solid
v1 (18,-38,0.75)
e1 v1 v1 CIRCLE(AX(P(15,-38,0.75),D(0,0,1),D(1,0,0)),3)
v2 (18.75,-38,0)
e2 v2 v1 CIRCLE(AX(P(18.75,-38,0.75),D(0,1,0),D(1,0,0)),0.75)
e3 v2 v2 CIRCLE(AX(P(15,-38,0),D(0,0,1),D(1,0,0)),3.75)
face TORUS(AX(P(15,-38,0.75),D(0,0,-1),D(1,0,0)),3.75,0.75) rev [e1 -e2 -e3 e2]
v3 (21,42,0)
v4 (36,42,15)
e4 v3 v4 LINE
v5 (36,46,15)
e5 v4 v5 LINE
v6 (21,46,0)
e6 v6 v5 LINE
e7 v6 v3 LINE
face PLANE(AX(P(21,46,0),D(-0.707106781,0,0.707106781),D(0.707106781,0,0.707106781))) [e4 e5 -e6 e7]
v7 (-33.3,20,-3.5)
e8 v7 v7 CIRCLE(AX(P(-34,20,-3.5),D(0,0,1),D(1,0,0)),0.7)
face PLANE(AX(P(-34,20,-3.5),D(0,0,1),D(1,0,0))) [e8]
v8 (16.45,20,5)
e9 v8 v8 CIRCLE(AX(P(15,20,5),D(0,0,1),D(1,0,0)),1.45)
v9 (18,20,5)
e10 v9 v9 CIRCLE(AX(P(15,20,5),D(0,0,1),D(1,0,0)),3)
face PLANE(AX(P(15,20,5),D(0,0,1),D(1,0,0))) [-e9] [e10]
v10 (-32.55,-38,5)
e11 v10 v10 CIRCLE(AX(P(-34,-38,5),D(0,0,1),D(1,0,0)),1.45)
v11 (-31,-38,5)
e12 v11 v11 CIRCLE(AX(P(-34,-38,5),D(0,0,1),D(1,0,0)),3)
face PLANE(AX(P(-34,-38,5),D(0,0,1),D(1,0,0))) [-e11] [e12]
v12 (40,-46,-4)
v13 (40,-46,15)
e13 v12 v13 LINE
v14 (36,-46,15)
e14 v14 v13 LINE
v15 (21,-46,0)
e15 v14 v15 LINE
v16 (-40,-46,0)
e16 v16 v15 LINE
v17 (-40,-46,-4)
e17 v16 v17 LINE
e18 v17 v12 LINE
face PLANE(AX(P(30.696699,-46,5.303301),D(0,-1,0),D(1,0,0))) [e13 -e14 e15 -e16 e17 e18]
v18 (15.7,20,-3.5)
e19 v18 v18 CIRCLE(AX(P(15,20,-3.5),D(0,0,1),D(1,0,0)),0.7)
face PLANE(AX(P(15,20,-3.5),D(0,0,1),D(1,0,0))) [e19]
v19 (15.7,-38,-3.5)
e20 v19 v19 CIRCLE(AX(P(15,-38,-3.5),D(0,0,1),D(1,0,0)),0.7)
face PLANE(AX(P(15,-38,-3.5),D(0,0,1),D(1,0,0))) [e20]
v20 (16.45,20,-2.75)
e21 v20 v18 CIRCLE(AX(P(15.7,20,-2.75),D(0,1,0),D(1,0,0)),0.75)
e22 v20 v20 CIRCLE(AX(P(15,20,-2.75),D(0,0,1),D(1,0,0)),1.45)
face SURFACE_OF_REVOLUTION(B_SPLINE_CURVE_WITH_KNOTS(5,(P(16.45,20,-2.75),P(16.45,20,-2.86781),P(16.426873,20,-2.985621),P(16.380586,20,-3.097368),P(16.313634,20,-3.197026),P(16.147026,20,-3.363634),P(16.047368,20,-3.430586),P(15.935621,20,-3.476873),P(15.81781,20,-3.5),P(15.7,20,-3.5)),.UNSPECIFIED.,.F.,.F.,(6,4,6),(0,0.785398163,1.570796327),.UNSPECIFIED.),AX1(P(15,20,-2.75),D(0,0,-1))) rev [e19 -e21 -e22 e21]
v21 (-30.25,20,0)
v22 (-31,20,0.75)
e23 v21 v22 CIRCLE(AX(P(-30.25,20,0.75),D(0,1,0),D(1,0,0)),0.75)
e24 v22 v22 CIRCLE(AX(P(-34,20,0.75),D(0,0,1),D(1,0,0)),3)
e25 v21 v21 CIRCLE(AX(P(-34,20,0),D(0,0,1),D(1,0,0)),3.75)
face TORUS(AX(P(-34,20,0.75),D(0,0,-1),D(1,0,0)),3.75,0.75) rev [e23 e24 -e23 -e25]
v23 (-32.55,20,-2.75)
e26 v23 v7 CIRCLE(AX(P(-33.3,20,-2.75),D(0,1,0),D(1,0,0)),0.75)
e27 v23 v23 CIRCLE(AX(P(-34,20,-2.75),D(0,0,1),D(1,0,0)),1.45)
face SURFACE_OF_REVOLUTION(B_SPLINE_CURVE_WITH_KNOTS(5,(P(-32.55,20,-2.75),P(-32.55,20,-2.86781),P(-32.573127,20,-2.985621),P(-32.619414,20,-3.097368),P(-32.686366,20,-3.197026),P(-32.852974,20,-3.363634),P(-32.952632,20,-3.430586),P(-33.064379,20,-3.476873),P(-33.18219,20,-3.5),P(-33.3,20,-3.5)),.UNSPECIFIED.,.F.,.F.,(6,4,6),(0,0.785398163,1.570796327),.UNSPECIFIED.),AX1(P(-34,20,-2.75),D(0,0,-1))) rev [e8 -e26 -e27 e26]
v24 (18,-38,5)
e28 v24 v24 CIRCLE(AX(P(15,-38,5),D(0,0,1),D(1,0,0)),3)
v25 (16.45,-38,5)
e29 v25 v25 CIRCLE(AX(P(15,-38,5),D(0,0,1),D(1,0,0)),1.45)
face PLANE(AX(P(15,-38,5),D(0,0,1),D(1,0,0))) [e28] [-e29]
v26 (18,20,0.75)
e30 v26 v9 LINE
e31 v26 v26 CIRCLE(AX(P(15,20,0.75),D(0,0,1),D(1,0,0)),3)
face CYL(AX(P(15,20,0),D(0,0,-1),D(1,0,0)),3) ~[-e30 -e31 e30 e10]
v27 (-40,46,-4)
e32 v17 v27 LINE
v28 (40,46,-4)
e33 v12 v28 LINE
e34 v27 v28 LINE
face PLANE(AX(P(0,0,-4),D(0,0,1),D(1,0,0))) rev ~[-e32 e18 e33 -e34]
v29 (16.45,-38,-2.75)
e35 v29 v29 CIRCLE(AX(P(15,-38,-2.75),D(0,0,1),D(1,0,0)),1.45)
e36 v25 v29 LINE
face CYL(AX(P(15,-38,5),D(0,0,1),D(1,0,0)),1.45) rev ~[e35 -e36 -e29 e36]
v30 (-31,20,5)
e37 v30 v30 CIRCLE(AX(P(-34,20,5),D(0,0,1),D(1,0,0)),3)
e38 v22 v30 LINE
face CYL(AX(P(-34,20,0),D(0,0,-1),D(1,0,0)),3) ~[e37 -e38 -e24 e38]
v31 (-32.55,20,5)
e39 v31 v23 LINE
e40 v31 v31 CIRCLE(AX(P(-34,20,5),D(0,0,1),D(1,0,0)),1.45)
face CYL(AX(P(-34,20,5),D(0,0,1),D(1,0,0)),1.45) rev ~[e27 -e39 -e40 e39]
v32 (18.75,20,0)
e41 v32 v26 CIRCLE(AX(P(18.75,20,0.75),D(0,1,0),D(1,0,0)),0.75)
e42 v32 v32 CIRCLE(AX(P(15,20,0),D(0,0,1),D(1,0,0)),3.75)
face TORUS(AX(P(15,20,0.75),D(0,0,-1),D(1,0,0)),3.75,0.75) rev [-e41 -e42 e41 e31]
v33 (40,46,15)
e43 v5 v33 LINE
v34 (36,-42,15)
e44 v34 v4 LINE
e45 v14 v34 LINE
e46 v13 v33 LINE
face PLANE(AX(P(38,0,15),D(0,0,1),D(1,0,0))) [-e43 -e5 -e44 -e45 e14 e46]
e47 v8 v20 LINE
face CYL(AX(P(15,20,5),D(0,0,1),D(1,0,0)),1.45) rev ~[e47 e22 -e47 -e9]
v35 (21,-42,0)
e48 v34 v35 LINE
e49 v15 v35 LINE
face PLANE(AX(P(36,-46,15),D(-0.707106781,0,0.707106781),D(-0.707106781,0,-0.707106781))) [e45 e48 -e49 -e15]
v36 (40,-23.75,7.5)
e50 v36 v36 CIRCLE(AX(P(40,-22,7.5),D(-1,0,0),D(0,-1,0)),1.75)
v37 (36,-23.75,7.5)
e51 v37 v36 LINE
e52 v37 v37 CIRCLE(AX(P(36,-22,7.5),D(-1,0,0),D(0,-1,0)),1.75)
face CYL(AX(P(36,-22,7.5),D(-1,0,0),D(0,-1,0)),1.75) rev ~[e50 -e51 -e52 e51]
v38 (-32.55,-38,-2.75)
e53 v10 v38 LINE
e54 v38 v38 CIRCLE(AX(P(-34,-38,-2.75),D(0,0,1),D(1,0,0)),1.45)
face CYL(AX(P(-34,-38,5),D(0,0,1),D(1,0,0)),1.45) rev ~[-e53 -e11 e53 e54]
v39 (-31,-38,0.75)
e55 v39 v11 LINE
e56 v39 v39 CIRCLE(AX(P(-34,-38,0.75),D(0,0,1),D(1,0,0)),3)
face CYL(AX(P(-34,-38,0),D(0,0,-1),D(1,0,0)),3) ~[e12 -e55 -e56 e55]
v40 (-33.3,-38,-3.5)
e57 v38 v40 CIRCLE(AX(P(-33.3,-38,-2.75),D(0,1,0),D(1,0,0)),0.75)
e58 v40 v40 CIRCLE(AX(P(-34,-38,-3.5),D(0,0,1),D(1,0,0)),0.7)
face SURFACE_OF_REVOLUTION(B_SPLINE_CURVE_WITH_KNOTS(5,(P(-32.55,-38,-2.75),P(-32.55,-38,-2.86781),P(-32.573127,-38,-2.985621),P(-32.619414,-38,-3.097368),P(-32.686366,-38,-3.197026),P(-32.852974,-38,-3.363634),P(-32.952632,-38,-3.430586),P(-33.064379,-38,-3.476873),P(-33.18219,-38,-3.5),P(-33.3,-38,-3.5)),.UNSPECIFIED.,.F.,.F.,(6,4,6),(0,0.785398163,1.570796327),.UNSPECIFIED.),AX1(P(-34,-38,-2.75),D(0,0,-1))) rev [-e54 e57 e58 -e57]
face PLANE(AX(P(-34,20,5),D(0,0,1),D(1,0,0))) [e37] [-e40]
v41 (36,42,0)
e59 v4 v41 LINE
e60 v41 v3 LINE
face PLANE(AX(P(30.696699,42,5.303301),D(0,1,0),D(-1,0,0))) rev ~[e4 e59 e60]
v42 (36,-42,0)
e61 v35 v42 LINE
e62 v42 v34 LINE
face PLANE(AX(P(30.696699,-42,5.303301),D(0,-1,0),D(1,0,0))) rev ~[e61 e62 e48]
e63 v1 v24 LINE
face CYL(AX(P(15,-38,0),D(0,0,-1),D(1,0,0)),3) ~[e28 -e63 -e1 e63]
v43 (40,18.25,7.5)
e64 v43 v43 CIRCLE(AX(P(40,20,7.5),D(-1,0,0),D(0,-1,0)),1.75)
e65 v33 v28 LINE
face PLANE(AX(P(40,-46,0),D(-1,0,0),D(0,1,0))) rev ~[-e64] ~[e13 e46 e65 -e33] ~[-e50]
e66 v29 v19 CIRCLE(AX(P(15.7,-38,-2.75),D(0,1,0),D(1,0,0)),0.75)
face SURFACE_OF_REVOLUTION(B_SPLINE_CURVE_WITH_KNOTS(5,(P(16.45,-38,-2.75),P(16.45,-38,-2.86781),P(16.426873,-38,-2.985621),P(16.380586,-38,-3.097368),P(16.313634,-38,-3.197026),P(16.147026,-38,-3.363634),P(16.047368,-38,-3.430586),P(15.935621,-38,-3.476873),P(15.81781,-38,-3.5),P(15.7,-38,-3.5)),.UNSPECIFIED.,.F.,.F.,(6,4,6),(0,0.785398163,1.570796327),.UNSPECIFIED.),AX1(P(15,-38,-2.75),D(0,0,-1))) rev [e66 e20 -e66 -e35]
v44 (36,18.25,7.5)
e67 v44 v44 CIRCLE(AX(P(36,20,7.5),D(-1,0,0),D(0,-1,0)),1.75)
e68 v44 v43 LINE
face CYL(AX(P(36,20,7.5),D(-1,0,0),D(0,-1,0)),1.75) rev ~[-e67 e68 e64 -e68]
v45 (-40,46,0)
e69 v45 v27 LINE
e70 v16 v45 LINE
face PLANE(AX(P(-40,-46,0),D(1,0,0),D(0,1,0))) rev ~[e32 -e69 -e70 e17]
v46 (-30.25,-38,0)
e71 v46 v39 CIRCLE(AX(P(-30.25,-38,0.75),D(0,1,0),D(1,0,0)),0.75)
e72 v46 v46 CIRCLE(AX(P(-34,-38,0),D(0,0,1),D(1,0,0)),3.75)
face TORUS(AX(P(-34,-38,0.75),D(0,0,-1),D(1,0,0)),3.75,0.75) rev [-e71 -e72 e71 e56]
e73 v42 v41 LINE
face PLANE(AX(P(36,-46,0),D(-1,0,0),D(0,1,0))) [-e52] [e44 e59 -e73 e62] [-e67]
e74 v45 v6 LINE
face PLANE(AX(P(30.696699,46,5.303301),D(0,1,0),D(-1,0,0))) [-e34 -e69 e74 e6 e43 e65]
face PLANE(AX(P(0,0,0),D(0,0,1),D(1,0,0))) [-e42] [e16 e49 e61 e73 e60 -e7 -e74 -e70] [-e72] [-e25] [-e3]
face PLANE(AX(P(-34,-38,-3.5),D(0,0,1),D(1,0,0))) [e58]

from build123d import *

# Parameters (mm, degrees)
F0_W      = 80
F0_H      = 92
F1_DEPTH  = 4
F3_R      = 3
F4_DEPTH  = 5
F6_R      = 1.45
F7_DEPTH  = 8.5
F8_R      = 0.75
F9_W      = 4
F9_H      = 92
F10_DEPTH = 15
F11_R     = 1.75
F12_DEPTH = 4
F14_DEPTH = 4
F16_DEPTH = 4


with BuildPart() as f1:
    # F0 (on Top) → F1 (new body)
    with BuildSketch(Plane.XY):
        Rectangle(F0_W, F0_H)
    extrude(amount=-F1_DEPTH)

    # F3 (on face) → F4 (join)
    with BuildSketch(Plane.XY):
        with Locations((-34, 20)):
            Circle(F3_R)
        with Locations((15, 20)):
            Circle(F3_R)
        with Locations((15, -38)):
            Circle(F3_R)
        with Locations((-34, -38)):
            Circle(F3_R)
    extrude(amount=F4_DEPTH)

    # F6 (on face) → F7 (cut, through all)
    with BuildSketch(Plane.XY.offset(5)):
        with Locations((-34, 20)):
            Circle(F6_R)
        with Locations((15, 20)):
            Circle(F6_R)
        with Locations((15, -38)):
            Circle(F6_R)
        with Locations((-34, -38)):
            Circle(F6_R)
    extrude(amount=-F7_DEPTH, mode=Mode.SUBTRACT)

    # F8
    f8_edges = [f1.edges().sort_by_distance(p)[0] for p in [
        (12, -38, 0),
        (-37, -38, 0),
        (12, 20, 0),
        (-37, 20, 0),
        (13.55, -38, -3.5),
        (-35.45, -38, -3.5),
        (-35.45, 20, -3.5),
        (13.55, 20, -3.5),
    ]]
    fillet(f8_edges, radius=F8_R)

    # F9 (on face) → F10 (join)
    with BuildSketch(Plane.XY):
        with Locations((38, 0)):
            Rectangle(F9_W, F9_H)
    extrude(amount=F10_DEPTH)

    # F11 (on face) → F12 (cut, through all)
    with BuildSketch(Plane(origin=(36, 0, 0), x_dir=(0, -1, 0), z_dir=(-1, 0, 0))):
        with Locations((-20, 7.5)):
            Circle(F11_R)
        with Locations((22, 7.5)):
            Circle(F11_R)
    extrude(amount=-F12_DEPTH, mode=Mode.SUBTRACT)

    # F13 (on face) → F14 (join)
    with BuildSketch(Plane(origin=(0, 46, 0), x_dir=(-1, 0, 0), z_dir=(0, 1, 0))):
        Polygon((-21, 0), (-36, 15), (-36, 0), align=None)
    extrude(amount=-F14_DEPTH)

    # F15 (on face) → F16 (join)
    with BuildSketch(Plane.XZ.offset(46)):
        Polygon((36, 0), (36, 15), (21, 0), align=None)
    extrude(amount=-F16_DEPTH)


solid = f1.part
